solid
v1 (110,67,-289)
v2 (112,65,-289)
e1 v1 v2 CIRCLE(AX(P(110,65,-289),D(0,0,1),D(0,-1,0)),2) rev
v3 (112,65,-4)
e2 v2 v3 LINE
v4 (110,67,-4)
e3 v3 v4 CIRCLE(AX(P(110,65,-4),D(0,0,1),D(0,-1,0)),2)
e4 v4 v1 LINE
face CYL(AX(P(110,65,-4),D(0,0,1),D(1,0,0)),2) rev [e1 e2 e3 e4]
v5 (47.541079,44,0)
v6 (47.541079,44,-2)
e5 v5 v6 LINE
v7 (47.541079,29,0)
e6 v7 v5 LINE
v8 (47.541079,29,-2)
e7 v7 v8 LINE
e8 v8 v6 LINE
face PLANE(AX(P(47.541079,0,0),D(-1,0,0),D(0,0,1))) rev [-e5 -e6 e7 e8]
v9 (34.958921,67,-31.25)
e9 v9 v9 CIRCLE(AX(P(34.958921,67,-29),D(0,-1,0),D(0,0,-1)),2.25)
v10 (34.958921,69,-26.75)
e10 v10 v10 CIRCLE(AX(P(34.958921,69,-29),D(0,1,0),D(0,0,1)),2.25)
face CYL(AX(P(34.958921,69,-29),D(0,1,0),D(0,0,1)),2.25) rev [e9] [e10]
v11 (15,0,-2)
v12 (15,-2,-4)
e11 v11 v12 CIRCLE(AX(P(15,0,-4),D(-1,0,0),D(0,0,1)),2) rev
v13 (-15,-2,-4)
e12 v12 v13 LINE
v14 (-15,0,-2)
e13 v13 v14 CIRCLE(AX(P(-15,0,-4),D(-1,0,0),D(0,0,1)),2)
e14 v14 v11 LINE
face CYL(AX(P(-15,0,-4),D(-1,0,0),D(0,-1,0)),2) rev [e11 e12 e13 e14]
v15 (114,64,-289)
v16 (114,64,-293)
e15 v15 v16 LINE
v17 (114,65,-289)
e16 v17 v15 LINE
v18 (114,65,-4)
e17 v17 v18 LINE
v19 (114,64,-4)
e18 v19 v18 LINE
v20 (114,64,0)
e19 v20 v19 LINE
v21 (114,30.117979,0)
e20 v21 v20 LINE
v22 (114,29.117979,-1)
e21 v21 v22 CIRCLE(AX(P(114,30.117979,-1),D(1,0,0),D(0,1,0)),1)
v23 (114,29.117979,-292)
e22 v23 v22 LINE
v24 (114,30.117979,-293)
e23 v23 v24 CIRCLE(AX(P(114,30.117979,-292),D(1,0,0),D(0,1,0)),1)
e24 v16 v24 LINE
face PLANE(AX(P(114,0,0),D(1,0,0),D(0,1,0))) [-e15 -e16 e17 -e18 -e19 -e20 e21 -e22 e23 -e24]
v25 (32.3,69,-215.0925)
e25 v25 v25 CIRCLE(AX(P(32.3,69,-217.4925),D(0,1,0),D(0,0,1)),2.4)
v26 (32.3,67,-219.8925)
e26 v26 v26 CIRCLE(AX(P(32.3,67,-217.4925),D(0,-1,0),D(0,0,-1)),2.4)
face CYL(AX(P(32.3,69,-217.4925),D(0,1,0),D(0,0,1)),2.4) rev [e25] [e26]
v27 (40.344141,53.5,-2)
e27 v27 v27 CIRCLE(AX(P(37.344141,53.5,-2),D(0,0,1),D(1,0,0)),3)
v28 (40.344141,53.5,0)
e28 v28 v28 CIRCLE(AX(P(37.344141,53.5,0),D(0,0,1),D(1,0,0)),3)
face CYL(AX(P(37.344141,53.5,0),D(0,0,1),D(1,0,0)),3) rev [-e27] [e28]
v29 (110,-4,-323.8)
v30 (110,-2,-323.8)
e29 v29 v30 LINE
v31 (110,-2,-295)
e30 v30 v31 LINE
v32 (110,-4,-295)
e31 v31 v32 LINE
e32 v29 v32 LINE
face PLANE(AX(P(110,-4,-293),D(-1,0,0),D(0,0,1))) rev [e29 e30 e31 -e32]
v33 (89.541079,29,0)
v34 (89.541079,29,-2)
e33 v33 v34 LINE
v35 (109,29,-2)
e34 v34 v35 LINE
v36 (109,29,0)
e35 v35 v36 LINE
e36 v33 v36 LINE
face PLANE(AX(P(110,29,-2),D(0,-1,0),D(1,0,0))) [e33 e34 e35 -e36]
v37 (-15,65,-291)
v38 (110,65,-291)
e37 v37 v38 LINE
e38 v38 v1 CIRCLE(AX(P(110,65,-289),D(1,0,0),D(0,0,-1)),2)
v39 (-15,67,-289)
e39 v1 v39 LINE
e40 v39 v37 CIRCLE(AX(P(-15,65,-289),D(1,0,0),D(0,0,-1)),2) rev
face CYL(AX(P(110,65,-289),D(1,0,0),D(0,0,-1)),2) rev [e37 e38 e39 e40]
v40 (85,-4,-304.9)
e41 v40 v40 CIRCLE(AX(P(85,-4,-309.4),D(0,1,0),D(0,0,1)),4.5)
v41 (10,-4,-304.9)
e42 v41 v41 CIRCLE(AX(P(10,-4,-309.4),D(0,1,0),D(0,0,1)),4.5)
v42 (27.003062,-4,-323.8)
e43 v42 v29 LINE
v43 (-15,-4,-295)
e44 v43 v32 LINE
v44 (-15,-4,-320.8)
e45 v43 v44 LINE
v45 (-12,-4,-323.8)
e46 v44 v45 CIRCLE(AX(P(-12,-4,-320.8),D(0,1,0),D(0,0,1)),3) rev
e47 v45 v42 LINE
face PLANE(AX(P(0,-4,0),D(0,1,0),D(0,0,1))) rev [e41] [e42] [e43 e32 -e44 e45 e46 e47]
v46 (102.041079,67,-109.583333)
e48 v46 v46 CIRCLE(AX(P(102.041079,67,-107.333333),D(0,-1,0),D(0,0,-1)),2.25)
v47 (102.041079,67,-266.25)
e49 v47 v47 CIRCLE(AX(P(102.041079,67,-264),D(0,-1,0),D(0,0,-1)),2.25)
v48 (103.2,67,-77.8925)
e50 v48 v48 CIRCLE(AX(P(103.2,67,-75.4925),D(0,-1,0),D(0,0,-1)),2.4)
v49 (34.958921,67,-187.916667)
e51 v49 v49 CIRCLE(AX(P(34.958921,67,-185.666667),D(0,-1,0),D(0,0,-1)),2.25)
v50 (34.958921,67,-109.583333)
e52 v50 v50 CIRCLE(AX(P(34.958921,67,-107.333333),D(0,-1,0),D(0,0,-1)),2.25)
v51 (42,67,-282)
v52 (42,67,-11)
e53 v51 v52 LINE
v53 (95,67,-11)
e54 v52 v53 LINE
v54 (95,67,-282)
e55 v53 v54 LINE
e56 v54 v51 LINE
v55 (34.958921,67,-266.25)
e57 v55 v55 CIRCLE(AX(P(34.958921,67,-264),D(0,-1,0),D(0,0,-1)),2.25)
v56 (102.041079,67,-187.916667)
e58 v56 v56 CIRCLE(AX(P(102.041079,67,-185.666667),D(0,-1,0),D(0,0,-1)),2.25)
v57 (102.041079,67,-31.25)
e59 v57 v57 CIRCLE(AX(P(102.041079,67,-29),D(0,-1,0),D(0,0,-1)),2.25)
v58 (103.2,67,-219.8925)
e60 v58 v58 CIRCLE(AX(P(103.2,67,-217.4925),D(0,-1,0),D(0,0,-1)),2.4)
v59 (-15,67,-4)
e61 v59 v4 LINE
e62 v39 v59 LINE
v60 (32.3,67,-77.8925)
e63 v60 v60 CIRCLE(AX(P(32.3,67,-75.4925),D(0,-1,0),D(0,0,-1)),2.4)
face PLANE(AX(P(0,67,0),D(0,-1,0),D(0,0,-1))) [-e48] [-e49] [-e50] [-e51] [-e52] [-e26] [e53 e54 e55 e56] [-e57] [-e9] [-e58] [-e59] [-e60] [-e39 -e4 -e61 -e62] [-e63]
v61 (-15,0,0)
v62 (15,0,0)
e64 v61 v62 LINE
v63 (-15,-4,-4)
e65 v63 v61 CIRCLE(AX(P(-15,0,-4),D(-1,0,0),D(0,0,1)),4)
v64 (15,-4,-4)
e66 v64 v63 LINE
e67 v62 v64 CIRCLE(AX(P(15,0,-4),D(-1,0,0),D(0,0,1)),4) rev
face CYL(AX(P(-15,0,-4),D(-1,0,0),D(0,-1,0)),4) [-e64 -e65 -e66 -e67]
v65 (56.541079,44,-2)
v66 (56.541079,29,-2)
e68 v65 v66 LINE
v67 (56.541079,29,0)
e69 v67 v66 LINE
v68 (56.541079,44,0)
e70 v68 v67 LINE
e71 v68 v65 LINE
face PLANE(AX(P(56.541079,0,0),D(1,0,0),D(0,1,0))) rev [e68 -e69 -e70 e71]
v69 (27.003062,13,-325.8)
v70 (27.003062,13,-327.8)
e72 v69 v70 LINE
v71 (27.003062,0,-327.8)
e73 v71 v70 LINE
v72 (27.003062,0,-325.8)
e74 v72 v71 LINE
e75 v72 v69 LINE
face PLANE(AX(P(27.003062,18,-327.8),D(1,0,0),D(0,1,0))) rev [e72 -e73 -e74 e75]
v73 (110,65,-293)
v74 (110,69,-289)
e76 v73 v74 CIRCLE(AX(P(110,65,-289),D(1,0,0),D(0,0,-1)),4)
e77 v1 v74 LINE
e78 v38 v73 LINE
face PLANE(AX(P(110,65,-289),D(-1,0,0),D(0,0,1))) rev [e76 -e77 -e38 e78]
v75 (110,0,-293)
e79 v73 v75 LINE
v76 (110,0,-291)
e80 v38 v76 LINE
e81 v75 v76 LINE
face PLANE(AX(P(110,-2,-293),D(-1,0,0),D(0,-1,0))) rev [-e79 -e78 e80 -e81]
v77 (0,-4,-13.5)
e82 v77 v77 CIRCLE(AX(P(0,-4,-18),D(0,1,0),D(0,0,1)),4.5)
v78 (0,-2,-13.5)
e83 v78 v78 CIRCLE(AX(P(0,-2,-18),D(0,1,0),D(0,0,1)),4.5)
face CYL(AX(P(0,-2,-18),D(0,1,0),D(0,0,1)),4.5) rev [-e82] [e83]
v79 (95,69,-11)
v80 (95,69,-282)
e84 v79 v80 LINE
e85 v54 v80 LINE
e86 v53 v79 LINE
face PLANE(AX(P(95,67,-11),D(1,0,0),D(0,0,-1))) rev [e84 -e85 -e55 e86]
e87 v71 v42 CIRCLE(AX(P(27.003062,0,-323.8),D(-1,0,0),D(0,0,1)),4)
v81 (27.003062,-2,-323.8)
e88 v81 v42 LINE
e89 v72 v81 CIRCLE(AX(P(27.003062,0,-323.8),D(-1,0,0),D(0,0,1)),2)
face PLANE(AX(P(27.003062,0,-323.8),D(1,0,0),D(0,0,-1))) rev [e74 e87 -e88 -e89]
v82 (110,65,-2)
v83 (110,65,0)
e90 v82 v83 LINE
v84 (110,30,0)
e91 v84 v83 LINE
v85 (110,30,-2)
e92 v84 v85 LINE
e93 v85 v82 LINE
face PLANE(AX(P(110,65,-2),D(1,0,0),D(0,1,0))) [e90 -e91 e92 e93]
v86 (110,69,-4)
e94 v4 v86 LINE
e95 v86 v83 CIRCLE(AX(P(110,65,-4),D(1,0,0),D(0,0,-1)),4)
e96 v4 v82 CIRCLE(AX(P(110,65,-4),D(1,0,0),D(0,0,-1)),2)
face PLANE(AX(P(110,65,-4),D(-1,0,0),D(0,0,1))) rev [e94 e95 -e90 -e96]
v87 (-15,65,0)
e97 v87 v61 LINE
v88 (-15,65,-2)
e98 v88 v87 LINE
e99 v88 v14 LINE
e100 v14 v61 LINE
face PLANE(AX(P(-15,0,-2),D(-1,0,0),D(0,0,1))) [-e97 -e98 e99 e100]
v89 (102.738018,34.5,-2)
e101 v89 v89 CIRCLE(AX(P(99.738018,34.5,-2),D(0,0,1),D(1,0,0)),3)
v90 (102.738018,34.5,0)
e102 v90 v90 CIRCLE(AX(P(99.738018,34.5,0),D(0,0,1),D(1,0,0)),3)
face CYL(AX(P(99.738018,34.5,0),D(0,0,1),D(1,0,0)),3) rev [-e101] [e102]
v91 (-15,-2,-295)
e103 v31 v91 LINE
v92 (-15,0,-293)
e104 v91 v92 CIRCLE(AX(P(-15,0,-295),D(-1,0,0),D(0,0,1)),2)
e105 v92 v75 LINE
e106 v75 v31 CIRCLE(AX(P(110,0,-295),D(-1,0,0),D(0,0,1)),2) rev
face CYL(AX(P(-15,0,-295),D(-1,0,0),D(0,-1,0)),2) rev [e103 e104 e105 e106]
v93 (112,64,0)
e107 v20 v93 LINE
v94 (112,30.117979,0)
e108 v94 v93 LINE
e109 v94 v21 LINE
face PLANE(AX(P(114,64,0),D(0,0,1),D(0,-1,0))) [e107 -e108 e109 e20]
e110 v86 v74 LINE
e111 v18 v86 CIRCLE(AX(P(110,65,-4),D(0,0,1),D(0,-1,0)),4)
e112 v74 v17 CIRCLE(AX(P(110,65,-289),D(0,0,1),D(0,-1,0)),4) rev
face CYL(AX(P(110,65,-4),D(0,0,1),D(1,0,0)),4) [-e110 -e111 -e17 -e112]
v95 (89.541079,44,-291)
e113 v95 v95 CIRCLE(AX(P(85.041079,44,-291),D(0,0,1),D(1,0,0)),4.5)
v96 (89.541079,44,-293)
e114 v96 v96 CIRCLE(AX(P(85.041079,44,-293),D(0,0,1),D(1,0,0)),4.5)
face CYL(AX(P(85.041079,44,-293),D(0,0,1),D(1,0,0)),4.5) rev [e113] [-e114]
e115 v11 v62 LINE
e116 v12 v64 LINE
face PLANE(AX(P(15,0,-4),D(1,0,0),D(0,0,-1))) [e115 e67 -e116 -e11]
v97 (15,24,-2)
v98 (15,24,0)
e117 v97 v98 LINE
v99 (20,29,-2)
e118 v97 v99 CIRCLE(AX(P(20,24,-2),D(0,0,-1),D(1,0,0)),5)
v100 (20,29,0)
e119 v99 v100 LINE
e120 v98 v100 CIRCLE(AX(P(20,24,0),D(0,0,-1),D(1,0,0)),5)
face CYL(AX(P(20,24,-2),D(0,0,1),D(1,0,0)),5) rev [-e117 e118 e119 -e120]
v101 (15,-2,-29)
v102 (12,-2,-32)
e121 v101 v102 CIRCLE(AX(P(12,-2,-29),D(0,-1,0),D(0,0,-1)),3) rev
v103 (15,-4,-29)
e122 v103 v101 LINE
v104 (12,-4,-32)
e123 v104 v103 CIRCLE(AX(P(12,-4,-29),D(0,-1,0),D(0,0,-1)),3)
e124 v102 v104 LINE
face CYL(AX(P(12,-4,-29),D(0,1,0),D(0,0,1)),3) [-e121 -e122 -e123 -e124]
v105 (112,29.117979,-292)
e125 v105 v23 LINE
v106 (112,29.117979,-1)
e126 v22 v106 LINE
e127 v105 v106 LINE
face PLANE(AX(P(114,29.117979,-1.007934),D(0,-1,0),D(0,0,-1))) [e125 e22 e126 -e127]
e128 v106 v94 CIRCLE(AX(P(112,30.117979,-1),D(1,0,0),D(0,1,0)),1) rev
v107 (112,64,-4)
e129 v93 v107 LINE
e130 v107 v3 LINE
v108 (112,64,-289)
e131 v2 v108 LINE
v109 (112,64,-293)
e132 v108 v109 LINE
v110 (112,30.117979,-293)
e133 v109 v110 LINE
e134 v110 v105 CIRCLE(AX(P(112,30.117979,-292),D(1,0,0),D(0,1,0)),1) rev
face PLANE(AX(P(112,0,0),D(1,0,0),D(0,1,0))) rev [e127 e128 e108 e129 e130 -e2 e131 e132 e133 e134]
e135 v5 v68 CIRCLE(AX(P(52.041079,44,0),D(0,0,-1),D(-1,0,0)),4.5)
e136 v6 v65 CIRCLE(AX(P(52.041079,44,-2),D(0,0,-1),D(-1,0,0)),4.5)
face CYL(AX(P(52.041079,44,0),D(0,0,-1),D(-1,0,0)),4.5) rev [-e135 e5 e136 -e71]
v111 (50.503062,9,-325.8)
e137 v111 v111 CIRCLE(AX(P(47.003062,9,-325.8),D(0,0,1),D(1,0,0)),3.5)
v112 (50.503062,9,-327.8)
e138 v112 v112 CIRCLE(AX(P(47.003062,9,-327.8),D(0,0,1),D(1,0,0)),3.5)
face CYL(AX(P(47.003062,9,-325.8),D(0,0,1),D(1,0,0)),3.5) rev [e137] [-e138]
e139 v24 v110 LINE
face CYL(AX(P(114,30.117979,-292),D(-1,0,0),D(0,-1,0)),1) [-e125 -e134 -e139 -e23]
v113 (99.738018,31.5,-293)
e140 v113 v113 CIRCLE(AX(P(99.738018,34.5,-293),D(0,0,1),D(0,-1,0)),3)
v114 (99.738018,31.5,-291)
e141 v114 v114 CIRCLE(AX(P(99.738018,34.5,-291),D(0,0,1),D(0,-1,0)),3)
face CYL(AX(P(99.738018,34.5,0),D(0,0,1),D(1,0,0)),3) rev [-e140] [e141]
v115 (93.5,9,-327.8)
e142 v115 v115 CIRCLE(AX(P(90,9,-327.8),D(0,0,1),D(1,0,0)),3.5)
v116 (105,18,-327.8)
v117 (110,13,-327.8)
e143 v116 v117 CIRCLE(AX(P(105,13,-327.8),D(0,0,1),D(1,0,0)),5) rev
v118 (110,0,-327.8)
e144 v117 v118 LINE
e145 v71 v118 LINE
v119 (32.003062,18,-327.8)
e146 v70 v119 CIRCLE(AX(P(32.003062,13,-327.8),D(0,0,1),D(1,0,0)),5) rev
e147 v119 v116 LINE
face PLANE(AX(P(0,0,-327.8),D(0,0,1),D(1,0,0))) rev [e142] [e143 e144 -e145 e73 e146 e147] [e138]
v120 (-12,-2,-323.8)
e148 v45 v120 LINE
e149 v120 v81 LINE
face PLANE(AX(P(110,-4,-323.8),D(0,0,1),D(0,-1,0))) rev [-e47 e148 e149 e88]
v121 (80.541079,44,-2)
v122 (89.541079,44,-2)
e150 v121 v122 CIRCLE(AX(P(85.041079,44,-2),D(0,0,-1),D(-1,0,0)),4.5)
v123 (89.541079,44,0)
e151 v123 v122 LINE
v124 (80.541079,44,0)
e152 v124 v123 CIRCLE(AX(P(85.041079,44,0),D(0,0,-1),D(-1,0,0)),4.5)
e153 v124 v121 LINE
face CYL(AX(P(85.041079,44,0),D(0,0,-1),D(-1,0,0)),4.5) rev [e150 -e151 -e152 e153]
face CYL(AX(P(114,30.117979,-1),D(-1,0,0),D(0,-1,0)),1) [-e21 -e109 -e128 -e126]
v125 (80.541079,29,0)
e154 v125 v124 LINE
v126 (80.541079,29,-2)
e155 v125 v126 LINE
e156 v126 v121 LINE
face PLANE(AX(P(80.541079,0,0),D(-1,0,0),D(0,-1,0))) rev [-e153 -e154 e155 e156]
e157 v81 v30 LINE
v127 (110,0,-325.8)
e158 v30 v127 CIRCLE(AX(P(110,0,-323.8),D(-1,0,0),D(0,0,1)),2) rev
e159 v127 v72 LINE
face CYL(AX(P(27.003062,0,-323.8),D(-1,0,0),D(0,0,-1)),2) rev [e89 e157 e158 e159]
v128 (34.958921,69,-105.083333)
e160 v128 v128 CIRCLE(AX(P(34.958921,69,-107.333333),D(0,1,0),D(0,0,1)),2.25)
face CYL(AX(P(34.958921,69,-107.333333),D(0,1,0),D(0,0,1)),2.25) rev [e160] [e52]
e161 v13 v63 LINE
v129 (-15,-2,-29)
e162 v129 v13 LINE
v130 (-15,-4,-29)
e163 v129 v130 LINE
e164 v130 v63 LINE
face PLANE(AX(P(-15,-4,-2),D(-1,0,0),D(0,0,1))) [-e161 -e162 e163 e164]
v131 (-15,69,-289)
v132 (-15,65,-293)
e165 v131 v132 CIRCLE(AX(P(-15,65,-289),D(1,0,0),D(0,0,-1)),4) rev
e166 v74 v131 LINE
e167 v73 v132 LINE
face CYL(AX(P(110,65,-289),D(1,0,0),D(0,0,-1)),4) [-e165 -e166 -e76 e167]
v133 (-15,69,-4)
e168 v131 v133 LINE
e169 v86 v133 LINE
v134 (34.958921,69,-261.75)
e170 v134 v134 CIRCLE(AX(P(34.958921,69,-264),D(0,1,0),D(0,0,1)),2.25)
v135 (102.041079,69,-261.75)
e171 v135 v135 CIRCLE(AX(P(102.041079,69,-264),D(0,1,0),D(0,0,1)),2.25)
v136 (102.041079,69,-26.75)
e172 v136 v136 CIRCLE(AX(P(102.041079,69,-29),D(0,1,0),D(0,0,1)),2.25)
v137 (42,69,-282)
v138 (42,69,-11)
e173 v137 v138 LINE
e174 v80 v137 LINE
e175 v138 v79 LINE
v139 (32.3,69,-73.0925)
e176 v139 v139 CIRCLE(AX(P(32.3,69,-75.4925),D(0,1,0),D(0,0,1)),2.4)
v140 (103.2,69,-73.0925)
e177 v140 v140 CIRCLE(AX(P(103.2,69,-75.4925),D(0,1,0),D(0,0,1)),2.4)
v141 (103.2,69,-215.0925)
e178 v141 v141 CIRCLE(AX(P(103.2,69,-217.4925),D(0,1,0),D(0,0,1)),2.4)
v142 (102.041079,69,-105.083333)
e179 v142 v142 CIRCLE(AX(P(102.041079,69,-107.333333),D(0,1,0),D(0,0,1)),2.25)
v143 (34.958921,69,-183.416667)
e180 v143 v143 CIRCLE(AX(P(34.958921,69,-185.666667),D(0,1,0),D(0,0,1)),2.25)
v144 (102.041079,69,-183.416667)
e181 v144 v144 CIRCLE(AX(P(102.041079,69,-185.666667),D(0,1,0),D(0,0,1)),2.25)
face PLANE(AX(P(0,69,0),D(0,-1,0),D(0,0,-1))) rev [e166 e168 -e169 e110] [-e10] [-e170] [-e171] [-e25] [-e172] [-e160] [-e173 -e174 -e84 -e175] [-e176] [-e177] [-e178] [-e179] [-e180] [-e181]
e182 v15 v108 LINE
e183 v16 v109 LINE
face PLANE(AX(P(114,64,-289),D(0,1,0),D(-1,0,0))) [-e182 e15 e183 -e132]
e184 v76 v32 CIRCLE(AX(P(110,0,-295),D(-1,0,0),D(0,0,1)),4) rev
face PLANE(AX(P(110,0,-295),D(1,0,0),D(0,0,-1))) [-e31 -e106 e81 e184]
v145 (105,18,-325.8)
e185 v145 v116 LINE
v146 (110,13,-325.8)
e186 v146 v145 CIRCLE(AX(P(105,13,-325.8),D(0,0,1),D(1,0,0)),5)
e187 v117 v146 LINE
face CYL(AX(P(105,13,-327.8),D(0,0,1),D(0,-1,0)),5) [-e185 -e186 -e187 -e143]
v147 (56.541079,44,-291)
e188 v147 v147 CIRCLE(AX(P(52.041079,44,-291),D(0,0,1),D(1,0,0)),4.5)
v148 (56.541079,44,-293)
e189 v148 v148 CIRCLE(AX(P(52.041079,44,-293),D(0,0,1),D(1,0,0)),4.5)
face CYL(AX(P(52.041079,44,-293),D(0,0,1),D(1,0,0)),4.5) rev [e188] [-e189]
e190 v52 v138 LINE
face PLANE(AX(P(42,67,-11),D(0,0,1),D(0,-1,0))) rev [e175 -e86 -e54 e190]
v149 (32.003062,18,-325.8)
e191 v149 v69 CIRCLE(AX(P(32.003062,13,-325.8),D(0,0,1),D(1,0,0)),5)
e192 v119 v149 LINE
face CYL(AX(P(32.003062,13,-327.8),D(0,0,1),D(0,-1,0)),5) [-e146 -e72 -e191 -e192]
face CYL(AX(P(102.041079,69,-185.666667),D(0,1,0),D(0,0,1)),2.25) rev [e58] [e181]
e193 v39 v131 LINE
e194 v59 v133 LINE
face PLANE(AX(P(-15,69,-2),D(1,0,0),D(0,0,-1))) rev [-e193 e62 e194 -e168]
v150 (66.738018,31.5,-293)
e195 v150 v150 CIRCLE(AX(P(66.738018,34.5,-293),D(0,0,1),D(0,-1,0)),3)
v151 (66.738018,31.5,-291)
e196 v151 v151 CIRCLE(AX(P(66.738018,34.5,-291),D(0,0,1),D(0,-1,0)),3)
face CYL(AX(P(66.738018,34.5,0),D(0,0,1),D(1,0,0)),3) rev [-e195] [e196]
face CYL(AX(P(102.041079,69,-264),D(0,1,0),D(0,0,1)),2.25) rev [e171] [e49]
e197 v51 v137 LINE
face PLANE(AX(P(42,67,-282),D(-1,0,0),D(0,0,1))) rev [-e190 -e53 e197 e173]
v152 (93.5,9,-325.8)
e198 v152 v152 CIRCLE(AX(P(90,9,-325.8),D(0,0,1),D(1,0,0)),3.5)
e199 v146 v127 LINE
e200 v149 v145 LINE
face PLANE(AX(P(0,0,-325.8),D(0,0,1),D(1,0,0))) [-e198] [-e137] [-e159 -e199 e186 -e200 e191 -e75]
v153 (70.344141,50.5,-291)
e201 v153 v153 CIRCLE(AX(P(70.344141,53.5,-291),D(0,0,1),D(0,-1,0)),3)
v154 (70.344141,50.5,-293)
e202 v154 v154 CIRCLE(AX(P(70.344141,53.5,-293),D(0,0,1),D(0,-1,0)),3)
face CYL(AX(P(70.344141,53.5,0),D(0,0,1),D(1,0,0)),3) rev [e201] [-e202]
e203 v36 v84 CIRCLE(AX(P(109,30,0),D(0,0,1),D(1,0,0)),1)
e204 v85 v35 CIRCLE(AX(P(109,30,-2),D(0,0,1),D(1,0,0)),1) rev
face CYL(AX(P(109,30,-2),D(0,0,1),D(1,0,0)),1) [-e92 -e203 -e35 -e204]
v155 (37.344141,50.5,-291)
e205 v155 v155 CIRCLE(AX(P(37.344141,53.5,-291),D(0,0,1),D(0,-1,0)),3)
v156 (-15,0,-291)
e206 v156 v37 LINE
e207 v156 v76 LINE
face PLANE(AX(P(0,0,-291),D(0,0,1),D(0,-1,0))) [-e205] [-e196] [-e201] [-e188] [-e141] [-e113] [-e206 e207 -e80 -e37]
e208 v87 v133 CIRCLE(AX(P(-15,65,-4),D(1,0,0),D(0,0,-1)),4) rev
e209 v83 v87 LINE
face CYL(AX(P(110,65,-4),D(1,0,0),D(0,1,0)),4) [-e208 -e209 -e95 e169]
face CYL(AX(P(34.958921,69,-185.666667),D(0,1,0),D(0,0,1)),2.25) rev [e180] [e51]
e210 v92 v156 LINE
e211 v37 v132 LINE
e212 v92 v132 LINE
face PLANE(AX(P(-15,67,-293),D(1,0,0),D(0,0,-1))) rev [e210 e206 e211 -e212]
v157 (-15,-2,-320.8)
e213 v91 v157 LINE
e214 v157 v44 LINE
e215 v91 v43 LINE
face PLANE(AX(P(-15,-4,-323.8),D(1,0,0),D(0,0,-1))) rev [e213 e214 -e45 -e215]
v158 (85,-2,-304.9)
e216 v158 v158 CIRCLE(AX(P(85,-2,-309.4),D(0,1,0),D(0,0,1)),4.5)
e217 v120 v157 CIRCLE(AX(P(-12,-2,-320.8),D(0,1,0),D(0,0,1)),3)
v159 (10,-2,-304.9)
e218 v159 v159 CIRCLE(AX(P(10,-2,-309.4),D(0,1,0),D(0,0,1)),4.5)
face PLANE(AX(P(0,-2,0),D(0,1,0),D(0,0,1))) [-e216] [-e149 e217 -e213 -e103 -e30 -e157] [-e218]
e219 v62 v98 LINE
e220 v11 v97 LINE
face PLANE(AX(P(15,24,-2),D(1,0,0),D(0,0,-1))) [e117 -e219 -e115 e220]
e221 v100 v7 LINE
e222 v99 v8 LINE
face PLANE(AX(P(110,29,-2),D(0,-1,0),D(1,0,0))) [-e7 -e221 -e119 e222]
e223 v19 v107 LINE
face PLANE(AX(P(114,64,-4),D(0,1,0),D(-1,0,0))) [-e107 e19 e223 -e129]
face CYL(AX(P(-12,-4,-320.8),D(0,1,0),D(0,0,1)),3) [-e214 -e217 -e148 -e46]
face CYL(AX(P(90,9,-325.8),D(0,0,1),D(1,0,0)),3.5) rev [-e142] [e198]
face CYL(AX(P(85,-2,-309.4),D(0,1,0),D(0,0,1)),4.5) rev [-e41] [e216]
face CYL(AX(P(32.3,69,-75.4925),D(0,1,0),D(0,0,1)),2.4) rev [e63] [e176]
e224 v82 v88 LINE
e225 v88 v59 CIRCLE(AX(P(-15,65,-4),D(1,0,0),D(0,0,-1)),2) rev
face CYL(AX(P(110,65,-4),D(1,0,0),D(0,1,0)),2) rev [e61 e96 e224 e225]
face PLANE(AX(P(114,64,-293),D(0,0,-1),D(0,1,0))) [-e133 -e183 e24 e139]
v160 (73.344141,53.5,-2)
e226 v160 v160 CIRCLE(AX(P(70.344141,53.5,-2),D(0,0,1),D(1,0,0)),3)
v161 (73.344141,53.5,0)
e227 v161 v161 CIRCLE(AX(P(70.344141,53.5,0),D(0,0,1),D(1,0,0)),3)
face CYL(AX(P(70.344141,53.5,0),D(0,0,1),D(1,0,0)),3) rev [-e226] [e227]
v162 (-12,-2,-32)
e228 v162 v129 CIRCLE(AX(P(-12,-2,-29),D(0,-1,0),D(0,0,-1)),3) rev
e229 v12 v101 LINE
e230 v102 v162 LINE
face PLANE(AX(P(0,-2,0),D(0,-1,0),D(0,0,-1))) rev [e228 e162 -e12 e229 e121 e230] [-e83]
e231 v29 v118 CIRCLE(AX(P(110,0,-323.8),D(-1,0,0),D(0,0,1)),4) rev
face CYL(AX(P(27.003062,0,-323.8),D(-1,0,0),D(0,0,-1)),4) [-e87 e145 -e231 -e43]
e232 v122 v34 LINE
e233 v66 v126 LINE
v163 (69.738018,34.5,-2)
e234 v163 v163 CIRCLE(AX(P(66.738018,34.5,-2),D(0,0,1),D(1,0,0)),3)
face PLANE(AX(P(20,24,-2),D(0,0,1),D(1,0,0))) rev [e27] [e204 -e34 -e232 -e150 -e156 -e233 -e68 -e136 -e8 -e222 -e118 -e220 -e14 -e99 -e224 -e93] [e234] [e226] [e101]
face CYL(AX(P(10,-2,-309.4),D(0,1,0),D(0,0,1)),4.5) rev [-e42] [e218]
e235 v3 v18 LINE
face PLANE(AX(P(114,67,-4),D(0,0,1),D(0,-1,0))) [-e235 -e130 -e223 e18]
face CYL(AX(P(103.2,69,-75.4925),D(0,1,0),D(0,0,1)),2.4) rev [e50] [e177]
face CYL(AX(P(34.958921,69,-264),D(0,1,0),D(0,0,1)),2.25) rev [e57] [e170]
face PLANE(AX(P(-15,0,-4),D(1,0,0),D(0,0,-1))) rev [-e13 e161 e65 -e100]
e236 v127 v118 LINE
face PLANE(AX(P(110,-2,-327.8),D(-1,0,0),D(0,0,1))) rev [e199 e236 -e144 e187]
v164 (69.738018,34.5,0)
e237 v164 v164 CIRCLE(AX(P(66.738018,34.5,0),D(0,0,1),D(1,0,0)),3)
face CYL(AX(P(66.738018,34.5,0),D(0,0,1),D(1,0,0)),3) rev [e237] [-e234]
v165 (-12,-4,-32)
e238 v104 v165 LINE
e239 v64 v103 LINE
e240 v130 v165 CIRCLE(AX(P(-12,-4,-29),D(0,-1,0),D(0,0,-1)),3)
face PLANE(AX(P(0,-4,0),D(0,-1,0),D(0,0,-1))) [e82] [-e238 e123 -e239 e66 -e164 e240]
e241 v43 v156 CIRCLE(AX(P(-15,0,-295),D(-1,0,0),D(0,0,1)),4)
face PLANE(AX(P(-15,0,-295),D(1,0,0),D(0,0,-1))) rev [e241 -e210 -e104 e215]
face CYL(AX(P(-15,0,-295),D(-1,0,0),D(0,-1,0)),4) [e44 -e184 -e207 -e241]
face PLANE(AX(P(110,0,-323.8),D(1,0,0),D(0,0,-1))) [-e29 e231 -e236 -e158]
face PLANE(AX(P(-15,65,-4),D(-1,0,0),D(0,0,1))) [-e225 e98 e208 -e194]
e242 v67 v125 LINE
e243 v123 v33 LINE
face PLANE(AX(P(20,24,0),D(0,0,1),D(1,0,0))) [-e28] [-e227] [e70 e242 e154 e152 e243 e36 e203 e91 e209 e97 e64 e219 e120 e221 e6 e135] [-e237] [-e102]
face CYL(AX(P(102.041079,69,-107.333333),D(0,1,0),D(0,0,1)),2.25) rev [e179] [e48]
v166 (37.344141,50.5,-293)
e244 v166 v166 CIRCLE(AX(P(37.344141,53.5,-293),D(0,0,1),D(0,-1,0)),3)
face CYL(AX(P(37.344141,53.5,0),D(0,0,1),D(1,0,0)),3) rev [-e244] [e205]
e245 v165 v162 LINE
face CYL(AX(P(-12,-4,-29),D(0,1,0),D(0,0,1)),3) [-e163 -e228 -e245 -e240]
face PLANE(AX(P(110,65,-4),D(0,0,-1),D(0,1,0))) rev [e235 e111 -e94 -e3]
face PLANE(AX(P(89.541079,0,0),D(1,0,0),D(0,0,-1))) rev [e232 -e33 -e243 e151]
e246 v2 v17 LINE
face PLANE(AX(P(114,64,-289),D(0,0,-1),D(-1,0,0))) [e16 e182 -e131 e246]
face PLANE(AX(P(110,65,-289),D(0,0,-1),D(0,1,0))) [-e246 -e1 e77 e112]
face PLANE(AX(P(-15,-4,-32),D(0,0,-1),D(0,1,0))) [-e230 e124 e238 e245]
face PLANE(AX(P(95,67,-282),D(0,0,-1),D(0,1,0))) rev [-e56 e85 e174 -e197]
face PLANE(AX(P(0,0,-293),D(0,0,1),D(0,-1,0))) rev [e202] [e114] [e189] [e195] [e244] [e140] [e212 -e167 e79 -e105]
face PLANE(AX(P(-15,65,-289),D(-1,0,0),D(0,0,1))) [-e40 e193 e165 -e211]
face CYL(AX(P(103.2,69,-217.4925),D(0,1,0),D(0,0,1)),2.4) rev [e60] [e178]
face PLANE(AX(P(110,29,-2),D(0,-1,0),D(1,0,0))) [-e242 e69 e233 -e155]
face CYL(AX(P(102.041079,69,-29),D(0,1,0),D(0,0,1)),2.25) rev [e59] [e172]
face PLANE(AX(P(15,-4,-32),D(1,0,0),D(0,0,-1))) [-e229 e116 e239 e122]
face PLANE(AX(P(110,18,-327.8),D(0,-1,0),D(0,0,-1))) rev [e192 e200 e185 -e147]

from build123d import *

# Parameters (mm, degrees)
BASE_FLANGE1_DEPTH            = 2
EDGE_FLANGE1_DEPTH            = 125
EDGE_FLANGE2_DEPTH            = 30
EDGE_FLANGE3_STRIP_W          = 12
EDGE_FLANGE3_STRIP_H          = 2
EDGE_FLANGE3_STRIP_CUT_DEPTH  = 125
EDGE_FLANGE3_DEPTH            = 125
EDGE_FLANGE4_STRIP_W          = 12
EDGE_FLANGE4_STRIP_H          = 2
EDGE_FLANGE4_STRIP_CUT_DEPTH  = 125
EDGE_FLANGE4_DEPTH            = 125
SKETCH19_W                    = 53
SKETCH19_H                    = 271
CUT_EXTRUDE2_DEPTH            = 4
M4_CLEARANCE_HOLE1_AT_2_COUNT = 2
M4_CLEARANCE_HOLE1_AT_2_PITCH = 78.333333333
M4_CLEARANCE_HOLE1_AT_3_COUNT = 2
M4_CLEARANCE_HOLE1_AT_3_PITCH = 156.666666667
M4_CLEARANCE_HOLE1_AT_4_COUNT = 2
M4_CLEARANCE_HOLE1_AT_4_PITCH = 235
M4_CLEARANCE_HOLE2_D          = 4.8
SKETCH25_R                    = 4.5
CUT_EXTRUDE3_DEPTH            = 10
CUT_EXTRUDE4_START            = -2
SKETCH26_R                    = 4.5
CUT_EXTRUDE4_DEPTH            = 2
F_6_0_6_DIAMETER_HOLE1_D      = 6
M8_CLEARANCE_HOLE1_D          = 9
M8_CLEARANCE_HOLE1_DEPTH      = 2
FILLET3_R                     = 3
M8_CLEARANCE_HOLE2_D          = 9
EDGE_FLANGE5_DEPTH            = 82.996938457
F_7_0_7_DIAMETER_HOLE1_D      = 7
F_7_0_7_DIAMETER_HOLE1_DEPTH  = 2
FILLET4_R                     = 5
EDGE_FLANGE6_DEPTH            = 285
EDGE_FLANGE6_START            = -2
EDGE_FLANGE6_FLAT_DEPTH       = 2
FILLET5_R                     = 1
FILLET6_R                     = 3


# Sheet-metal steps are written as plain solids
with BuildPart() as part:
    # Sketch1 → Base-Flange1 (new body)
    with BuildSketch(Plane.XY):
        with BuildLine():
            Line((15, 0), (-15, 0))
            Line((-15, 0), (-15, 65))
            Line((-15, 65), (110, 65))
            Line((110, 65), (110, 29))
            Line((110, 29), (20, 29))
            ThreePointArc((20, 29), (16.464466094, 27.535533906), (15, 24))
            Line((15, 24), (15, 0))
        make_face()
    extrude(amount=-BASE_FLANGE1_DEPTH)

    # Edge-Flange1 section (across the edge) → Edge-Flange1 (add)
    with BuildSketch(Plane(origin=(-15, 67, -2), x_dir=(0, -1, 0), z_dir=(1, 0, 0))):
        with BuildLine():
            Line((-2, 2), (-2, 289))
            Line((-2, 289), (0, 289))
            Line((0, 289), (0, 2))
            ThreePointArc((0, 2), (0.585786438, 0.585786438), (2, 0))
            Line((2, 0), (2, -2))
            ThreePointArc((2, -2), (-0.828427125, -0.828427125), (-2, 2))
        make_face()
    extrude(amount=EDGE_FLANGE1_DEPTH)

    # Edge-Flange2 section (across the edge) → Edge-Flange2 (add)
    with BuildSketch(Plane(origin=(15, -2, -2), x_dir=(0, 1, 0), z_dir=(-1, 0, 0))):
        with BuildLine():
            Line((-2, 2), (-2, 30))
            Line((-2, 30), (0, 30))
            Line((0, 30), (0, 2))
            ThreePointArc((0, 2), (0.585786438, 0.585786438), (2, 0))
            Line((2, 0), (2, -2))
            ThreePointArc((2, -2), (-0.828427125, -0.828427125), (-2, 2))
        make_face()
    extrude(amount=EDGE_FLANGE2_DEPTH)

    # Edge-Flange3 strip (across the edge) → Edge-Flange3 strip cut (cut)
    with BuildSketch(Plane(origin=(-15, 67, -291), x_dir=(0, 0, 1), z_dir=(1, 0, 0))):
        with Locations((-4, -1)):
            Rectangle(EDGE_FLANGE3_STRIP_W, EDGE_FLANGE3_STRIP_H)
    extrude(amount=EDGE_FLANGE3_STRIP_CUT_DEPTH, mode=Mode.SUBTRACT)

    # Edge-Flange3 section (across the edge) → Edge-Flange3 (add)
    with BuildSketch(Plane(origin=(-15, 67, -291), x_dir=(0, 0, 1), z_dir=(1, 0, 0))):
        with BuildLine():
            Line((-2, 2), (-2, 69))
            Line((-2, 69), (0, 69))
            Line((0, 69), (0, 2))
            ThreePointArc((0, 2), (0.585786438, 0.585786438), (2, 0))
            Line((2, 0), (2, -2))
            ThreePointArc((2, -2), (-0.828427125, -0.828427125), (-2, 2))
        make_face()
    extrude(amount=EDGE_FLANGE3_DEPTH)

    # Edge-Flange4 strip (across the edge) → Edge-Flange4 strip cut (cut)
    with BuildSketch(Plane(origin=(110, -2, -293), x_dir=(0, 1, 0), z_dir=(-1, 0, 0))):
        with Locations((-4, -1)):
            Rectangle(EDGE_FLANGE4_STRIP_W, EDGE_FLANGE4_STRIP_H)
    extrude(amount=EDGE_FLANGE4_STRIP_CUT_DEPTH, mode=Mode.SUBTRACT)

    # Edge-Flange4 section (across the edge) → Edge-Flange4 (add)
    with BuildSketch(Plane(origin=(110, -2, -293), x_dir=(0, 1, 0), z_dir=(-1, 0, 0))):
        with BuildLine():
            Line((-2, 2), (-2, 30.8))
            Line((-2, 30.8), (0, 30.8))
            Line((0, 30.8), (0, 2))
            ThreePointArc((0, 2), (0.585786438, 0.585786438), (2, 0))
            Line((2, 0), (2, -2))
            ThreePointArc((2, -2), (-0.828427125, -0.828427125), (-2, 2))
        make_face()
    extrude(amount=EDGE_FLANGE4_DEPTH)

    # Sketch19 → Cut-Extrude2 (cut)
    with BuildSketch(Plane(origin=(0, 69, 0), x_dir=(1, 0, 0), z_dir=(0, 1, 0))):
        with Locations((68.5, 146.5)):
            Rectangle(SKETCH19_W, SKETCH19_H)
    extrude(amount=-CUT_EXTRUDE2_DEPTH, mode=Mode.SUBTRACT)

    # Sketch22 → M4 Clearance Hole1 (revolve, cut)
    with BuildSketch(Plane(origin=(102.041079456, 69, -264), x_dir=(0, 0, 1), z_dir=(1, 0, 0))):
        Polygon((0, 0), (0, 5.351936393), (2.25, 4), (2.25, 0), align=None)
    m4_clearance_hole1 = revolve(axis=Axis((102.041079456, 75.35, -264), (0, -1, 0)), mode=Mode.SUBTRACT)

    # M4 Clearance Hole1 at 2: M4 Clearance Hole1 ×2
    with Locations(*[(0, 0, i * M4_CLEARANCE_HOLE1_AT_2_PITCH) for i in range(1, M4_CLEARANCE_HOLE1_AT_2_COUNT)]):
        add(m4_clearance_hole1, mode=Mode.SUBTRACT)

    # M4 Clearance Hole1 at 3: M4 Clearance Hole1 ×2
    with Locations(*[(0, 0, i * M4_CLEARANCE_HOLE1_AT_3_PITCH) for i in range(1, M4_CLEARANCE_HOLE1_AT_3_COUNT)]):
        add(m4_clearance_hole1, mode=Mode.SUBTRACT)

    # M4 Clearance Hole1 at 4: M4 Clearance Hole1 ×2
    with Locations(*[(0, 0, i * M4_CLEARANCE_HOLE1_AT_4_PITCH) for i in range(1, M4_CLEARANCE_HOLE1_AT_4_COUNT)]):
        add(m4_clearance_hole1, mode=Mode.SUBTRACT)

    # M4 Clearance Hole2 (through all)
    with Locations(Plane(origin=(0, 69, 0), x_dir=(1, 0, 0), z_dir=(0, 1, 0))):
        with Locations((103.2, 217.4925), (103.2, 75.4925), (32.3, 217.4925), (32.3, 75.4925)):
            Hole(M4_CLEARANCE_HOLE2_D / 2)

    # Mirror1: M4 Clearance Hole1 across plane
    add(m4_clearance_hole1.mirror(Plane.ZY.offset(-68.5)), mode=Mode.SUBTRACT)

    # Mirror1 copy 1 sketch → Mirror1 copy 1 (revolve, cut)
    with BuildSketch(Plane(origin=(34.958920544, 69, -185.666666667), x_dir=(0, 0, 1), z_dir=(-1, 0, 0))):
        Polygon((0, 0), (0, -5.351936393), (2.25, -4), (2.25, 0), align=None)
    revolve(axis=Axis((34.958920544, 75.35, -185.666666667), (0, 1, 0)), mode=Mode.SUBTRACT)

    # Mirror1 copy 2 sketch → Mirror1 copy 2 (revolve, cut)
    with BuildSketch(Plane(origin=(34.958920544, 69, -107.333333333), x_dir=(0, 0, 1), z_dir=(-1, 0, 0))):
        Polygon((0, 0), (0, -5.351936393), (2.25, -4), (2.25, 0), align=None)
    revolve(axis=Axis((34.958920544, 75.35, -107.333333333), (0, 1, 0)), mode=Mode.SUBTRACT)

    # Mirror1 copy 3 sketch → Mirror1 copy 3 (revolve, cut)
    with BuildSketch(Plane(origin=(34.958920544, 69, -29), x_dir=(0, 0, 1), z_dir=(-1, 0, 0))):
        Polygon((0, 0), (0, -5.351936393), (2.25, -4), (2.25, 0), align=None)
    revolve(axis=Axis((34.958920544, 75.35, -29), (0, 1, 0)), mode=Mode.SUBTRACT)

    # Sketch25 → Cut-Extrude3 (cut)
    with BuildSketch(Plane(origin=(0, 0, -2), x_dir=(-1, 0, 0), z_dir=(0, 0, -1))):
        with BuildLine():
            ThreePointArc((-80.541079456, 44), (-85.041079456, 39.5), (-89.541079456, 44))
            Line((-89.541079456, 44), (-89.541079456, 29))
            Line((-89.541079456, 29), (-80.541079456, 29))
            Line((-80.541079456, 29), (-80.541079456, 44))
        make_face()
        with Locations((-85.041079456, 44)):
            Circle(SKETCH25_R)
        with Locations((-52.041079456, 44)):
            Circle(SKETCH25_R)
        with BuildLine():
            Line((-56.541079456, 44), (-56.541079456, 29))
            Line((-56.541079456, 29), (-47.541079456, 29))
            Line((-47.541079456, 29), (-47.541079456, 44))
            ThreePointArc((-47.541079456, 44), (-52.041079456, 39.5), (-56.541079456, 44))
        make_face()
    extrude(amount=-CUT_EXTRUDE3_DEPTH, mode=Mode.SUBTRACT)

    # Sketch26 → Cut-Extrude4 (cut)
    with BuildSketch(Plane.XY.offset(-291).offset(CUT_EXTRUDE4_START)):
        with Locations((85.041079456, 44)):
            Circle(SKETCH26_R)
        with Locations((52.041079456, 44)):
            Circle(SKETCH26_R)
    extrude(amount=CUT_EXTRUDE4_DEPTH, mode=Mode.SUBTRACT)

    # Ø6.0 (6) Diameter Hole1 (through all)
    with Locations(Plane.XY):
        with Locations((99.738017913, 34.5), (70.344140999, 53.5), (66.738017913, 34.5), (37.344140999, 53.5)):
            Hole(F_6_0_6_DIAMETER_HOLE1_D / 2)

    # M8 Clearance Hole1
    with Locations(Plane(origin=(0, -2, 0), x_dir=(1, 0, 0), z_dir=(0, 1, 0))):
        with Locations((0, 18)):
            Hole(M8_CLEARANCE_HOLE1_D / 2, depth=M8_CLEARANCE_HOLE1_DEPTH)

    # Fillet3
    fillet3_edges = [part.edges().sort_by_distance(p)[0] for p in [
        (15, -3, -32),
        (-15, -3, -32),
    ]]
    fillet(fillet3_edges, radius=FILLET3_R)

    # M8 Clearance Hole2 (through all)
    with Locations(Plane(origin=(0, -2, 0), x_dir=(1, 0, 0), z_dir=(0, 1, 0))):
        with Locations((85, 309.4), (10, 309.4)):
            Hole(M8_CLEARANCE_HOLE2_D / 2)

    # Edge-Flange5 section (across the edge) → Edge-Flange5 (add)
    with BuildSketch(Plane(origin=(110, -2, -325.8), x_dir=(0, 0, 1), z_dir=(-1, 0, 0))):
        with BuildLine():
            Line((-2, 2), (-2, 20))
            Line((-2, 20), (0, 20))
            Line((0, 20), (0, 2))
            ThreePointArc((0, 2), (0.585786438, 0.585786438), (2, 0))
            Line((2, 0), (2, -2))
            ThreePointArc((2, -2), (-0.828427125, -0.828427125), (-2, 2))
        make_face()
    extrude(amount=EDGE_FLANGE5_DEPTH)

    # Ø7.0 (7) Diameter Hole1
    with Locations(Plane.XY.offset(-325.8)):
        with Locations((90, 9), (47.003061543, 9)):
            Hole(F_7_0_7_DIAMETER_HOLE1_D / 2, depth=F_7_0_7_DIAMETER_HOLE1_DEPTH)

    # Fillet4
    fillet4_edges = [part.edges().sort_by_distance(p)[0] for p in [
        (110, 18, -326.8),
        (27.003061543, 18, -326.8),
    ]]
    fillet(fillet4_edges, radius=FILLET4_R)

    # Edge-Flange6 bend section (across the edge) → Edge-Flange6 (add)
    with BuildSketch(Plane(origin=(112, 67, -289), x_dir=(-1, 0, 0), z_dir=(0, 0, 1))):
        with BuildLine():
            Line((-2, 2), (0, 2))
            ThreePointArc((0, 2), (0.585786438, 0.585786438), (2, 0))
            Line((2, 0), (2, -2))
            ThreePointArc((2, -2), (-0.828427125, -0.828427125), (-2, 2))
        make_face()
    extrude(amount=EDGE_FLANGE6_DEPTH)

    # Edge-Flange6 profile (on flange) → Edge-Flange6 flat (add)
    with BuildSketch(Plane(origin=(112, 67, 0), x_dir=(0, 0, -1), z_dir=(-1, 0, 0)).offset(EDGE_FLANGE6_START)):
        Polygon((4, 2), (289, 2), (289, 3), (293, 3), (293, 37.882021368), (291.992065684, 37.882021368), (1.007934316, 37.882021368), (0, 37.882021368), (0, 3), (4, 3), align=None)
    extrude(amount=EDGE_FLANGE6_FLAT_DEPTH)

    # Fillet5
    fillet5_edges = [part.edges().sort_by_distance(p)[0] for p in [
        (110, 29, -1),
        (113, 29.117978632, 0),
        (113, 29.117978632, -293),
    ]]
    fillet(fillet5_edges, radius=FILLET5_R)

    # Fillet6
    fillet6_edges = [part.edges().sort_by_distance(p)[0] for p in [
        (-15, -3, -323.8),
    ]]
    fillet(fillet6_edges, radius=FILLET6_R)


solid = part.part
